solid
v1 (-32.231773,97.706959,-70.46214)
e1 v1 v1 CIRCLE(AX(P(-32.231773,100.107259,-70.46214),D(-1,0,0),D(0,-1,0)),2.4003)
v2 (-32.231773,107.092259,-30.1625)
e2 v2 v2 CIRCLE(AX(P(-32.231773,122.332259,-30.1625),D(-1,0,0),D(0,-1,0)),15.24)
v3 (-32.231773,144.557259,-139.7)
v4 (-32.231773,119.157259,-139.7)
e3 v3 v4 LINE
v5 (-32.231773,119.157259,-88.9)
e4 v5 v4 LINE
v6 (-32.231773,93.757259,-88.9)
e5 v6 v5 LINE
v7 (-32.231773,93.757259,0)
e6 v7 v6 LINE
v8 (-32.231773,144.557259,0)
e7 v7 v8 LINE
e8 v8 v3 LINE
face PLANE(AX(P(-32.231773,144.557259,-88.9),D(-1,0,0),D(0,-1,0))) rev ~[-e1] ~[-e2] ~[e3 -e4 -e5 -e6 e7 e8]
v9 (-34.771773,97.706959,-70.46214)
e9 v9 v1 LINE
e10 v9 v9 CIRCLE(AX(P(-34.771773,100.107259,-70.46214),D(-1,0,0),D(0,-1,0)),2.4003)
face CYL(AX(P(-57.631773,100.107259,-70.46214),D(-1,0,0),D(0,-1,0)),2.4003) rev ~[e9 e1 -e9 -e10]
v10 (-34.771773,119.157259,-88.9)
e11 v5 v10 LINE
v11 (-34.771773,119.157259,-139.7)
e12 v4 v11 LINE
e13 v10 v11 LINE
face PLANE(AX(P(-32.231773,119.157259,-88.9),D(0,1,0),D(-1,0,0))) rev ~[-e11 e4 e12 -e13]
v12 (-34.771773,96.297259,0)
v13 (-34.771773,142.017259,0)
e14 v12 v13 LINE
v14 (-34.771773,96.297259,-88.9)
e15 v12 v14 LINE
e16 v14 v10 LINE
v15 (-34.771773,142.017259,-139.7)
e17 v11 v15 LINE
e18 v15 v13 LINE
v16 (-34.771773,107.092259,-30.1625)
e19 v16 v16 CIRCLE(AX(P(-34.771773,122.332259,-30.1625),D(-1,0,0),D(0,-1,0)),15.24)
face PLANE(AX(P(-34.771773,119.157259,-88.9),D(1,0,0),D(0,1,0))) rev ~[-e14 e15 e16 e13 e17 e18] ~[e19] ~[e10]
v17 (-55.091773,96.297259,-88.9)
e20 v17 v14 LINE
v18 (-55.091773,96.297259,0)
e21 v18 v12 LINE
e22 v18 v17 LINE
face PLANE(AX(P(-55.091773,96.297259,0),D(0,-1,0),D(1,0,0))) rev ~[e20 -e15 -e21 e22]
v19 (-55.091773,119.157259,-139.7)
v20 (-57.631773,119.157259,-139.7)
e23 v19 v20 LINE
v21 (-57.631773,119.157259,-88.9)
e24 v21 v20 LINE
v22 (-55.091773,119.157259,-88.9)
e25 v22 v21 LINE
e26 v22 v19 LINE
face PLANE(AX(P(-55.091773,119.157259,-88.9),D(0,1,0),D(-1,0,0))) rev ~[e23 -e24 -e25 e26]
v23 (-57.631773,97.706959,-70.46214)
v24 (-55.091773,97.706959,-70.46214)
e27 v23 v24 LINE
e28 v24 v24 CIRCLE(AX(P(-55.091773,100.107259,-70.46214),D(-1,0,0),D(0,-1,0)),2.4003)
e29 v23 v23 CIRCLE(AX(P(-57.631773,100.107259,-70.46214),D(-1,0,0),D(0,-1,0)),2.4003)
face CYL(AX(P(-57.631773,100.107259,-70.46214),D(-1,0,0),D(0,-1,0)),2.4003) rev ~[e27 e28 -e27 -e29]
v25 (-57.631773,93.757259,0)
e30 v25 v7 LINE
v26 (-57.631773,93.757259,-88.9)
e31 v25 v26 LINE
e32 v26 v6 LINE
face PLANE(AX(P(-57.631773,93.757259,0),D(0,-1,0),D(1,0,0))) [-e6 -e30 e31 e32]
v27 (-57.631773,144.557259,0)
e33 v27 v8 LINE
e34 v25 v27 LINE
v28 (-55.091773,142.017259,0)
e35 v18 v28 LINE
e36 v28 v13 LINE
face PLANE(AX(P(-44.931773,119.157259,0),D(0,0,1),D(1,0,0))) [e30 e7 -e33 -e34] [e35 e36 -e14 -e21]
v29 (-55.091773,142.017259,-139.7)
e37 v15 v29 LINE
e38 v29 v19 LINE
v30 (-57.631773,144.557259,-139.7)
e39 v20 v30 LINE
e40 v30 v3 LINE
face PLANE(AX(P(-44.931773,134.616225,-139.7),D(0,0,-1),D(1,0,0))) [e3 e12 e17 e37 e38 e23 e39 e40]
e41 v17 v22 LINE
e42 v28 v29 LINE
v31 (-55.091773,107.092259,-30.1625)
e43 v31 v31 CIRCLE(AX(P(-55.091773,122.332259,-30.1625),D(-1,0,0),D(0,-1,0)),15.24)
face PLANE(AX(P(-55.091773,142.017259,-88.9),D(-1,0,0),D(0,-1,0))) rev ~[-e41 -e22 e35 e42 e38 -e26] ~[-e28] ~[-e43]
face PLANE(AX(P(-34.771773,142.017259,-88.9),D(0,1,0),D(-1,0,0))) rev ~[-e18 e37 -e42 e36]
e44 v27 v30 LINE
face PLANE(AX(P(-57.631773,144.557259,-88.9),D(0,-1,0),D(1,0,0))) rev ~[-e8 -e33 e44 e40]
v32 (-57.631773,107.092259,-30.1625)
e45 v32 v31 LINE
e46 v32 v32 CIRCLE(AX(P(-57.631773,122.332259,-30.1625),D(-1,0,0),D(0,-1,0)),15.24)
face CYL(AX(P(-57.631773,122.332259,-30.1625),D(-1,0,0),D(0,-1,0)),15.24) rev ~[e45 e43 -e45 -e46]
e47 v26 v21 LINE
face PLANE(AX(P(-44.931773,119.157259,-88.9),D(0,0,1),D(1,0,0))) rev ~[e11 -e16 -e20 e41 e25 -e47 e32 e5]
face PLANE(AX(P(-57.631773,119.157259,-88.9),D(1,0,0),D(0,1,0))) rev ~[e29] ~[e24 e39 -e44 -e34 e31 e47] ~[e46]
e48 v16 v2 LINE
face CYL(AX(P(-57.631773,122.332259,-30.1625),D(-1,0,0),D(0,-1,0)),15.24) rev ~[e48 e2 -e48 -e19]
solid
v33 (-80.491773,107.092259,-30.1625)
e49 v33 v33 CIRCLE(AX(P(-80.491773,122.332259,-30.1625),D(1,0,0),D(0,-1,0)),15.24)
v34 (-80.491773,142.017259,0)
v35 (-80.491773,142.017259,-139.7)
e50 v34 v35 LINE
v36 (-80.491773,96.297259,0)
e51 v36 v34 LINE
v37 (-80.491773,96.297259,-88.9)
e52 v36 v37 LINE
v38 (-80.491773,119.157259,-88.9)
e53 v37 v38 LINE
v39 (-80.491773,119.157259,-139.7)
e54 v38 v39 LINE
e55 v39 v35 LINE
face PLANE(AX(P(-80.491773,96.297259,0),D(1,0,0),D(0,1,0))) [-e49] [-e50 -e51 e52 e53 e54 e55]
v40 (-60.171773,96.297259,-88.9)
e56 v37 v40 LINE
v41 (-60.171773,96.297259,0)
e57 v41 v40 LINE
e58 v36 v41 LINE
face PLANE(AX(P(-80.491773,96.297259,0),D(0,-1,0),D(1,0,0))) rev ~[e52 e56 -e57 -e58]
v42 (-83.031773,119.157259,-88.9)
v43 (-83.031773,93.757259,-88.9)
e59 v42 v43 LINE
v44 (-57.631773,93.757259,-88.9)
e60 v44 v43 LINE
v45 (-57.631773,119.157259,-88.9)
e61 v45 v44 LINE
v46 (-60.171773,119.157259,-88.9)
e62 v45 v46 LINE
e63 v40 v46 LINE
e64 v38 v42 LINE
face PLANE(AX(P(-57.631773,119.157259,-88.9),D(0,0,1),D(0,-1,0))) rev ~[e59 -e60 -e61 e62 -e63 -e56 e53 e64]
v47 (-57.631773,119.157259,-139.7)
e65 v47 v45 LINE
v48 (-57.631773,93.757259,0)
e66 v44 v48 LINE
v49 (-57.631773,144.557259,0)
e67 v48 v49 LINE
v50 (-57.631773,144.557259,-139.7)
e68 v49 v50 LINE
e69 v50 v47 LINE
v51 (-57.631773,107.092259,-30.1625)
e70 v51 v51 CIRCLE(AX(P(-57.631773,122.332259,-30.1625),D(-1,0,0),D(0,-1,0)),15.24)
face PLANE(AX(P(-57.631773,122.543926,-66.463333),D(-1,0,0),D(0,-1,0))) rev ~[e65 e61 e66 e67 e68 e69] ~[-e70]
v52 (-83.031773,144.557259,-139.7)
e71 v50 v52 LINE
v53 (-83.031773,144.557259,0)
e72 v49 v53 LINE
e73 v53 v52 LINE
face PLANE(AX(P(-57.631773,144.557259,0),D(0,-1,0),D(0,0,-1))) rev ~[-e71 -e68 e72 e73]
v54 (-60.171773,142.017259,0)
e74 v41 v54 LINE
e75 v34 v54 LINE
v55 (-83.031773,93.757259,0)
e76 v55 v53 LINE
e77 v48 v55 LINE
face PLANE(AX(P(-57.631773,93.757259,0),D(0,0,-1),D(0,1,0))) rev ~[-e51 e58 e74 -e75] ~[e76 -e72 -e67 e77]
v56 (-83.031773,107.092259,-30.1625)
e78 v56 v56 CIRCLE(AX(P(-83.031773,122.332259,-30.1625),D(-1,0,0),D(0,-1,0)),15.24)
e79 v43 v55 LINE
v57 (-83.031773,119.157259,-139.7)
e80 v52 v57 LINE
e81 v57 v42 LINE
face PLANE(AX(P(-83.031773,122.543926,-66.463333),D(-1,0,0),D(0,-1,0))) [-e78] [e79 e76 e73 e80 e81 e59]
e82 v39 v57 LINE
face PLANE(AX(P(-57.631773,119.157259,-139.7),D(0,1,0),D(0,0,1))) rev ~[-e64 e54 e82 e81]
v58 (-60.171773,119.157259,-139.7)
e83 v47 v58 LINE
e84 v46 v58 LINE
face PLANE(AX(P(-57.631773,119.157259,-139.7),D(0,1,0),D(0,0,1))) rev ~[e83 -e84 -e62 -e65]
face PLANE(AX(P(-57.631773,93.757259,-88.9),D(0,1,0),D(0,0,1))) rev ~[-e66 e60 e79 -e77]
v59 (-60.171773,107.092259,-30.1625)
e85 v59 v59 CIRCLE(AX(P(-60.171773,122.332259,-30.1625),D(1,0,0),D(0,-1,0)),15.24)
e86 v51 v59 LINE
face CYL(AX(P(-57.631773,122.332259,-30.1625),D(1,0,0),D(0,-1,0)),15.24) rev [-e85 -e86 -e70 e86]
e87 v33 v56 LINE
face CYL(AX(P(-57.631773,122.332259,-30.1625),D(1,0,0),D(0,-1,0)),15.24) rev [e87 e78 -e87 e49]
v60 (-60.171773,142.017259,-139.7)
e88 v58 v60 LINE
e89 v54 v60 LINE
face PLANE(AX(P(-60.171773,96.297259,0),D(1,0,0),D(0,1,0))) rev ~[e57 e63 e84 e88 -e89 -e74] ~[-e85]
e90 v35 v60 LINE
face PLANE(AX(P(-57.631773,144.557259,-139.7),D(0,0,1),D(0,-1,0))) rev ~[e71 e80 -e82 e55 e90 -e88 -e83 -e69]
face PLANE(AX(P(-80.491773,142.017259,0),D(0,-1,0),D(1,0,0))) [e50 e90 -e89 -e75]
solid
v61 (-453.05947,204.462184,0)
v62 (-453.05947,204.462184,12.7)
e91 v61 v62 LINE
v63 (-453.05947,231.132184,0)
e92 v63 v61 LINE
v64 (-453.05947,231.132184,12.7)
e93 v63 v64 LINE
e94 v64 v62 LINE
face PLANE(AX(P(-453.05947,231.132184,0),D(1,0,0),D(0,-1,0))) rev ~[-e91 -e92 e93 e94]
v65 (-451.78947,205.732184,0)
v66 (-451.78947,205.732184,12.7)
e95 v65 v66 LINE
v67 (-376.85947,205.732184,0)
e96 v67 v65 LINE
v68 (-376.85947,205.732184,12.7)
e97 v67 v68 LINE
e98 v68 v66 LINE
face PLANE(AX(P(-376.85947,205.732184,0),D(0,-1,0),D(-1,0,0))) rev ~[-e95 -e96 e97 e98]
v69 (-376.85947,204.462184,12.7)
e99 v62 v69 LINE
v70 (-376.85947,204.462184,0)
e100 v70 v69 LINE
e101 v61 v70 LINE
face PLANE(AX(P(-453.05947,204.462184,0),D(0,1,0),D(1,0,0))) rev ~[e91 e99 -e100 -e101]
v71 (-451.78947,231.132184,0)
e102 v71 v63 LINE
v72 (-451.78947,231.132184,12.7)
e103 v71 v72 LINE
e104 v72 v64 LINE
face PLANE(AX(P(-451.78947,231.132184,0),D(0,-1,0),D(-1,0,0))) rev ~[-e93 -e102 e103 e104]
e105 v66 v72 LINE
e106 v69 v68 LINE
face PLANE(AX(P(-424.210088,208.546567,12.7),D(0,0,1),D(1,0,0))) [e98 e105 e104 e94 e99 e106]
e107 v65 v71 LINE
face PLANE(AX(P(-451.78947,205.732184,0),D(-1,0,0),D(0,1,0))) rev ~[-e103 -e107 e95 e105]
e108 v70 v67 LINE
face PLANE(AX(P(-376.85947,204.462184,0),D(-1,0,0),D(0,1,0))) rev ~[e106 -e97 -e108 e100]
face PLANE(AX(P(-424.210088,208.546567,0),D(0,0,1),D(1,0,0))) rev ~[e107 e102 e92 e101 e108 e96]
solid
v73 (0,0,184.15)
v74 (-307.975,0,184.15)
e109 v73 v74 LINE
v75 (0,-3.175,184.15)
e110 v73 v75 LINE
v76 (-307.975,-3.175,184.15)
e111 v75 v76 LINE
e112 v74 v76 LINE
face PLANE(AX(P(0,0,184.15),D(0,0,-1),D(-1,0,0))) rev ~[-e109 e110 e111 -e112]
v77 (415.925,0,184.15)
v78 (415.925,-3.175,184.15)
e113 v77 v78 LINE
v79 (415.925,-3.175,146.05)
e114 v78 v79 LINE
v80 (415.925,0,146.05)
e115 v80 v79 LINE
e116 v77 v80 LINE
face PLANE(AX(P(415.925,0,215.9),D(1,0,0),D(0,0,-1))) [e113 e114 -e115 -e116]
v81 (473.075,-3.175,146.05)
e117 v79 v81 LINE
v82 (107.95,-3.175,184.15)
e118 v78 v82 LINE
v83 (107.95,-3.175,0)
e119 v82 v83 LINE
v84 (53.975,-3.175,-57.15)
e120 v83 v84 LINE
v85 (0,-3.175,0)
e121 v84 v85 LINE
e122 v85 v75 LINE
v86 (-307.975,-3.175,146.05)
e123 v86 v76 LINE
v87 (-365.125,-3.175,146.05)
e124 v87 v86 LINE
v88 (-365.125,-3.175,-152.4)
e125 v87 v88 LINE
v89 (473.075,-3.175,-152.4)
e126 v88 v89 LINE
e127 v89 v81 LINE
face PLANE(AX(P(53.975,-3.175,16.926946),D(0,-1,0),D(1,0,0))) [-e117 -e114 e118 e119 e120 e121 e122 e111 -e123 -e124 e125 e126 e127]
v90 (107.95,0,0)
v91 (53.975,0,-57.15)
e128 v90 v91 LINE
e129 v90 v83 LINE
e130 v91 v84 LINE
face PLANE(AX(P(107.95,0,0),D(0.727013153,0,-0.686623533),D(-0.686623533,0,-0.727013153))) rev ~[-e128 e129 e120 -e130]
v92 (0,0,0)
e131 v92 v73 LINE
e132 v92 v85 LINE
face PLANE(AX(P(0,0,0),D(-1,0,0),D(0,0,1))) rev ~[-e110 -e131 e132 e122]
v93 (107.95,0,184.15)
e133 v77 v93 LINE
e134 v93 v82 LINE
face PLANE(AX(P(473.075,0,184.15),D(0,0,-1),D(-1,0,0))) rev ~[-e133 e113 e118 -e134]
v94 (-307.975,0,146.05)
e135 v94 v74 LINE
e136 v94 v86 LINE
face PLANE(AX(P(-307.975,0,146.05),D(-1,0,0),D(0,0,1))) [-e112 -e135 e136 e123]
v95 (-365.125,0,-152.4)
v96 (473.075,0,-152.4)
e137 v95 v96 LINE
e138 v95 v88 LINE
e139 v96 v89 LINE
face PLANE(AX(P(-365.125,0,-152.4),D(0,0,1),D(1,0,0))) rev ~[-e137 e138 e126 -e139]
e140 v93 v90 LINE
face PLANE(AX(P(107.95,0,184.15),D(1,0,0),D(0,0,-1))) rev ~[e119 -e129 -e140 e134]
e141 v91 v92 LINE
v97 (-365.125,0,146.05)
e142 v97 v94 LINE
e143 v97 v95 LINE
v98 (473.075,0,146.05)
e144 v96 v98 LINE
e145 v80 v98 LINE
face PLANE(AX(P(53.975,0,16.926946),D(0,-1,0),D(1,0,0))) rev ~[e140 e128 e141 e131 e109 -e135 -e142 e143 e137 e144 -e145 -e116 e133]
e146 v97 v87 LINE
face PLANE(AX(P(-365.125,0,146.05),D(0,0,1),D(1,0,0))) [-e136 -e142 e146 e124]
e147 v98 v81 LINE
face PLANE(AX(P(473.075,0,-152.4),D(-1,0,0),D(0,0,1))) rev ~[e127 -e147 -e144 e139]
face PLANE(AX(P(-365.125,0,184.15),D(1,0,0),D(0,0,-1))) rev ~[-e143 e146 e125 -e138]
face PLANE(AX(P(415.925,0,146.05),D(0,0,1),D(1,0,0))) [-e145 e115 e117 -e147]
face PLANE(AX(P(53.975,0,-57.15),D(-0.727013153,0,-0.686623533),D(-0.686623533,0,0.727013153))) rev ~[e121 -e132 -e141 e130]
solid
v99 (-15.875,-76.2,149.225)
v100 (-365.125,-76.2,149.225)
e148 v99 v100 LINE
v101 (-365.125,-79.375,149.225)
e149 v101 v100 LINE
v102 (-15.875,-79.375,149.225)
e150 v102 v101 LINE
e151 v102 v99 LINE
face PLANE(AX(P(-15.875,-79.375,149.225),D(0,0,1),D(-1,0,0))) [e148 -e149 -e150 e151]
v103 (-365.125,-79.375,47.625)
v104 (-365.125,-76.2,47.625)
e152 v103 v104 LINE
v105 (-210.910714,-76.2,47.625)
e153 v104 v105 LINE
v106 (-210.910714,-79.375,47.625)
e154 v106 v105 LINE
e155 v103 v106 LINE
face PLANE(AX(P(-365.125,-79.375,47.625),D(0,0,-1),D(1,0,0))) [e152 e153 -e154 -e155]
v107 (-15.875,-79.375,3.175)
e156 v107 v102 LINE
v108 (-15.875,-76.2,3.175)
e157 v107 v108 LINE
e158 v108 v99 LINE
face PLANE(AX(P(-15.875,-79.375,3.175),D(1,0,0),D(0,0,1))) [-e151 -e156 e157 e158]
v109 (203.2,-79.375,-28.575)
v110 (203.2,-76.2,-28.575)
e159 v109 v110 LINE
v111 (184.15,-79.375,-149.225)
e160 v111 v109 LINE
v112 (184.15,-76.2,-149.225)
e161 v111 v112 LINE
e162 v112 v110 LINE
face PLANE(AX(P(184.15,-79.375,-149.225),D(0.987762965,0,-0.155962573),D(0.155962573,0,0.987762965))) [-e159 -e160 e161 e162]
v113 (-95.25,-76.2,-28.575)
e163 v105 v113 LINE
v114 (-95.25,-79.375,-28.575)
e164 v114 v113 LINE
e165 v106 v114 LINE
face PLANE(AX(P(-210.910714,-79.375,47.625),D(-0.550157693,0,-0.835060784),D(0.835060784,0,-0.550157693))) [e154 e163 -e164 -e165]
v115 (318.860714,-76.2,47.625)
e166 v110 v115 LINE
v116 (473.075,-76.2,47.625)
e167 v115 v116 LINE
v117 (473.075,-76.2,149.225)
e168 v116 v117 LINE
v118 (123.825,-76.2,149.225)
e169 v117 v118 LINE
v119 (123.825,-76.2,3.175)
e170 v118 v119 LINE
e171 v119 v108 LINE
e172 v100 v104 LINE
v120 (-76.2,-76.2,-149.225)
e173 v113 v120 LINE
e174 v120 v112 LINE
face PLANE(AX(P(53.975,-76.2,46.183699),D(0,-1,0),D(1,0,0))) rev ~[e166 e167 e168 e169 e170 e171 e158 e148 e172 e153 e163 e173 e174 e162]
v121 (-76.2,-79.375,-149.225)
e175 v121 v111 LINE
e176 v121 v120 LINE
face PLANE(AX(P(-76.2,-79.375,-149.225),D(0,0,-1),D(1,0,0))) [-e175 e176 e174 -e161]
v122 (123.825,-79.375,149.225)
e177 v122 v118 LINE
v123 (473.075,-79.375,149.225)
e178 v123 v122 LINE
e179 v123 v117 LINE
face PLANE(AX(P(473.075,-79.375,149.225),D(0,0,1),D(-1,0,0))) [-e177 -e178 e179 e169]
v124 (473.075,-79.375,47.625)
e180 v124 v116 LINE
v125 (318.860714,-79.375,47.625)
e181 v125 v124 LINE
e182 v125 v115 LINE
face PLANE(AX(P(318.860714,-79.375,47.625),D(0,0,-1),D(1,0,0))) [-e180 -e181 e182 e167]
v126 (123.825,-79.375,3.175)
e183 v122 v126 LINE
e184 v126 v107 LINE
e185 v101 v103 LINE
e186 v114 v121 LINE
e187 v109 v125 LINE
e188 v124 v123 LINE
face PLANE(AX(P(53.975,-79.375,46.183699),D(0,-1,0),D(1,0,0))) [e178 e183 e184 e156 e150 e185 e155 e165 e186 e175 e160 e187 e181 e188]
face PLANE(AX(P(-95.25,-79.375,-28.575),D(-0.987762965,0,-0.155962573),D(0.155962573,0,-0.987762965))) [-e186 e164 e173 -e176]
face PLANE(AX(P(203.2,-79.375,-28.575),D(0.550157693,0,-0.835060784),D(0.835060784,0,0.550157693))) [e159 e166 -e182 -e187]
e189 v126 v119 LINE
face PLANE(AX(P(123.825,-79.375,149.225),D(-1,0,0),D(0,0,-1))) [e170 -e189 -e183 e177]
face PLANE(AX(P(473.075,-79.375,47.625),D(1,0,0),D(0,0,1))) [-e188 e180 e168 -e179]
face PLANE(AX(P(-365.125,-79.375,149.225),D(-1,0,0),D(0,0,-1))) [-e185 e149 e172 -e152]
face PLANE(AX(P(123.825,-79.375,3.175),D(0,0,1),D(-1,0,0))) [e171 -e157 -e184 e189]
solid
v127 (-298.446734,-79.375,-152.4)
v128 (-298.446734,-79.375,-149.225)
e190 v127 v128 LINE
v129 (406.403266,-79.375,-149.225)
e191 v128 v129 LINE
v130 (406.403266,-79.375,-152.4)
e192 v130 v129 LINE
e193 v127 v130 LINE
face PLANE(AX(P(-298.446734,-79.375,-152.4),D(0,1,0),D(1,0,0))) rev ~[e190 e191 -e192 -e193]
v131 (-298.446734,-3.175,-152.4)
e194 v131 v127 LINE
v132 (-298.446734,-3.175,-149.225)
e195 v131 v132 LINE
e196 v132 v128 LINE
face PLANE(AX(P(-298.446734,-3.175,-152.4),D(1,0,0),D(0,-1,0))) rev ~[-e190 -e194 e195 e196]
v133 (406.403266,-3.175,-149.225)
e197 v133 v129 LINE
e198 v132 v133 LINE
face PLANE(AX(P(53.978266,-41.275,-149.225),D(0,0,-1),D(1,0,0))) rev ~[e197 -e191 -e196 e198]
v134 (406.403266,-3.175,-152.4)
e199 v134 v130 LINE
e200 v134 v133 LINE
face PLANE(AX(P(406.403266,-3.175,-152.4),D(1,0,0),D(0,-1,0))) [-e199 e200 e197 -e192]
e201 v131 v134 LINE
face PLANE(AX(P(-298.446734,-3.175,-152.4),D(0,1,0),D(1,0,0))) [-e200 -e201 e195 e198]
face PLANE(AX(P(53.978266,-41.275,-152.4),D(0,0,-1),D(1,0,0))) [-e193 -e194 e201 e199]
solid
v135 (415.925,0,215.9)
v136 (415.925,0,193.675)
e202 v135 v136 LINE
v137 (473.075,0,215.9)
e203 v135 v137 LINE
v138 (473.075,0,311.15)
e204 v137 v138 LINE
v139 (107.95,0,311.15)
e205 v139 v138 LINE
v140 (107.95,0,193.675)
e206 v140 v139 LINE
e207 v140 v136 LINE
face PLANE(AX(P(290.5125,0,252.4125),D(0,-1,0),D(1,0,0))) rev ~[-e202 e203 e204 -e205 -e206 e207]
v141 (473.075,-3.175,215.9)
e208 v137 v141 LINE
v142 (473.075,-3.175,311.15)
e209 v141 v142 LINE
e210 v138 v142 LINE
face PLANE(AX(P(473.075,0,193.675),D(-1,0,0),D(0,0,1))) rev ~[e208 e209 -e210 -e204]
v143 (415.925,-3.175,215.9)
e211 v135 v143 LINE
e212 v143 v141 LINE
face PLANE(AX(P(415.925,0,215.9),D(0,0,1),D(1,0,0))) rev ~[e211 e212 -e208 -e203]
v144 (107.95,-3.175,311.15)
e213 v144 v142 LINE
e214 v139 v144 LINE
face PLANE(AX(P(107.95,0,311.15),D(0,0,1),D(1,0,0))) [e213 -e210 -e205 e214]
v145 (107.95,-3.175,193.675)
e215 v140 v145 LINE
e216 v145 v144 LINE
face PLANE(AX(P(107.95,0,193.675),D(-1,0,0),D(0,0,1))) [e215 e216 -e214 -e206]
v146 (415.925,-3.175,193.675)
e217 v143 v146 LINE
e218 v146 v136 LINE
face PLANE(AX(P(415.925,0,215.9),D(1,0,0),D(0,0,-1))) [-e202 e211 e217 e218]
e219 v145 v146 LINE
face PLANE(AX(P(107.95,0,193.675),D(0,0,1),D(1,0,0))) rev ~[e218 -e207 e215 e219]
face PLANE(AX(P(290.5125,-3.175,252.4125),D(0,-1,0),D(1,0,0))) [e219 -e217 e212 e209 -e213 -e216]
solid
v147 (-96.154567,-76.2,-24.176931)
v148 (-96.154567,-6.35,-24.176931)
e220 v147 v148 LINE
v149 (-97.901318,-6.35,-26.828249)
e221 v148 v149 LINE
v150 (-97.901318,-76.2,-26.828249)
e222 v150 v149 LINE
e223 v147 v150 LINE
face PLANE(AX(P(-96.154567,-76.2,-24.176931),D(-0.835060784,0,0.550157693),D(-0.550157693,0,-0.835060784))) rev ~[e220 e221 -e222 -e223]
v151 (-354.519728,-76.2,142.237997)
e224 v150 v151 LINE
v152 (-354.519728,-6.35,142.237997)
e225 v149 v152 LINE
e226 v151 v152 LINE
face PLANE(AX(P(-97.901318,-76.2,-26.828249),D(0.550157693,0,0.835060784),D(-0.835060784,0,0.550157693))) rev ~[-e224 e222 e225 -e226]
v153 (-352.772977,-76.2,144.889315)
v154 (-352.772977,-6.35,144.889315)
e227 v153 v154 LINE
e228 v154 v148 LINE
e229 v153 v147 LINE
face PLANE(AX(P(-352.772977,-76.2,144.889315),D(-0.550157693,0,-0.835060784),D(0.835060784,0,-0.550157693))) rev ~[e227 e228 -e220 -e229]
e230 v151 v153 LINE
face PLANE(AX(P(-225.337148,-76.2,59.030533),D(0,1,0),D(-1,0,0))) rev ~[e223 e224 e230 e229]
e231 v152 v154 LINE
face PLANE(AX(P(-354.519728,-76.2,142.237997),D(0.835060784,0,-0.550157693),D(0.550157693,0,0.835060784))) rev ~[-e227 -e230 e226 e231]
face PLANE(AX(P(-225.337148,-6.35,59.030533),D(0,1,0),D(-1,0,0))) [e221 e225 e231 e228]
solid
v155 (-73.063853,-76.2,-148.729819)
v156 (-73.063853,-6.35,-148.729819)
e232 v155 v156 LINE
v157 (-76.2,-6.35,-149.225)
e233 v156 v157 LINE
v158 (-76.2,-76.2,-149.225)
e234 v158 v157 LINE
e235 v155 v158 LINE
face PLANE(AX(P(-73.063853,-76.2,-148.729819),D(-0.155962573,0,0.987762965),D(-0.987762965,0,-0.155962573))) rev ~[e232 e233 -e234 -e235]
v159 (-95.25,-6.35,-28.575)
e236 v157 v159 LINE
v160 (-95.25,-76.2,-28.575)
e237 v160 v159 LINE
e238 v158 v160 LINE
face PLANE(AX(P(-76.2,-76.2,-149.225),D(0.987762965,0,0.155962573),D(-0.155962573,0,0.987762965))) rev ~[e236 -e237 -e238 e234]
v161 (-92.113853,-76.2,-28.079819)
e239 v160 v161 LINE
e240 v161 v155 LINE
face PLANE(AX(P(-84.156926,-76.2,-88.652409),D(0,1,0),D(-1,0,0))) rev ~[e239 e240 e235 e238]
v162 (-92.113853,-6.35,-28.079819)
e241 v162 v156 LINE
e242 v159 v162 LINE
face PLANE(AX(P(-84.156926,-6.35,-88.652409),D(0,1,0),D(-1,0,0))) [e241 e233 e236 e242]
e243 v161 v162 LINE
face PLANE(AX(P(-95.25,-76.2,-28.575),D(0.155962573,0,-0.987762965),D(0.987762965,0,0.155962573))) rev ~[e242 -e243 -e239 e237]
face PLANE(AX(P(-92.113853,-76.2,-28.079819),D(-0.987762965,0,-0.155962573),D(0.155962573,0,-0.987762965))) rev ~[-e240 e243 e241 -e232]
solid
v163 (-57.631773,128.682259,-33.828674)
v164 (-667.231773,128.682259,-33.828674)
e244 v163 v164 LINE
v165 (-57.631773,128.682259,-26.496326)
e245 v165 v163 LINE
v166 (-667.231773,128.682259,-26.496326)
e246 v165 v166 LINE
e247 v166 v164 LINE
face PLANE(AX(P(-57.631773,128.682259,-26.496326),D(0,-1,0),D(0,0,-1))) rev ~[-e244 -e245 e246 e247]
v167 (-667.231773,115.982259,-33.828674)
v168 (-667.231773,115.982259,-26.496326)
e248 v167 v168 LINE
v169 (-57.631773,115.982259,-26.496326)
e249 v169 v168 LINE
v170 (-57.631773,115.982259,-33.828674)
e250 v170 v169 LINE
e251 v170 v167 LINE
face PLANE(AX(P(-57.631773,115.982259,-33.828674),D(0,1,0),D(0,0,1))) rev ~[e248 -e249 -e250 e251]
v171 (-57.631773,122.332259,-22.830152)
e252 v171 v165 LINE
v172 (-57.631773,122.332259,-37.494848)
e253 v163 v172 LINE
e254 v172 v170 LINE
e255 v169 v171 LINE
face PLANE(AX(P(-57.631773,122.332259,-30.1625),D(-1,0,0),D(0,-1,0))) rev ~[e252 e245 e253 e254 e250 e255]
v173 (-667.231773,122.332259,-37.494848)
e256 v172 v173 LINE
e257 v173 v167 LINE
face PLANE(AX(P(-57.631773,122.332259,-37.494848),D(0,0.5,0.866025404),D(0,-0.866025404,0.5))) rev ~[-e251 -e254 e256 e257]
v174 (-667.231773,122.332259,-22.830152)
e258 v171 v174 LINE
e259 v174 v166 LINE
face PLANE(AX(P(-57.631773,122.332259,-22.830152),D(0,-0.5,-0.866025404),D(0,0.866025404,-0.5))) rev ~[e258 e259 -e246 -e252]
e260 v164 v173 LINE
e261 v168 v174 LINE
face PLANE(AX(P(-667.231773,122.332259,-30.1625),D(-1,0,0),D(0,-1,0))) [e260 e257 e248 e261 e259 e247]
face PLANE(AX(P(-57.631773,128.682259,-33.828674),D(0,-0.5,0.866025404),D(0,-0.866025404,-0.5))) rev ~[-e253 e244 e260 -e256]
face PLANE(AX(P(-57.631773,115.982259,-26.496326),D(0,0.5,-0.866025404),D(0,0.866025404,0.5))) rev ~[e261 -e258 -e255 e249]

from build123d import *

# Parameters (mm, degrees)
F1_DEPTH  = 3.175
F2_W      = 704.85
F2_H      = 76.2
F3_DEPTH  = 3.175
F0_W      = 365.125
F0_H      = 117.475
F4_DEPTH  = 3.175
F6_DEPTH  = 3.175
F8_DEPTH  = 69.85
F10_DEPTH = 69.85
F11_W     = 25.4
F11_H     = 50.8
F11_W_2   = 20.32
F11_H_2   = 45.72
F12_DEPTH = 88.9
F13_R     = 15.24
F13_R_2   = 2.4003
F14_DEPTH = 25.4
F16_DEPTH = 609.6
F17_W     = 57.15
F17_H     = 38.1
F17_H_2   = 31.75
F18_DEPTH = 3.175
F20_DEPTH = 12.7
F22_DEPTH = 50.8
F23_R     = 15.24
F24_DEPTH = 25.4
F25_W     = 20.32
F25_H     = 45.72
F26_DEPTH = 139.7


# Not quite as in the source:
# - a length typed as a fraction of an inch, garbled in the dataset ("3 / 203.2 mm" for 3/8 in), is restored


with BuildPart() as f1:
    # F0 (on Front) → F1 (new body)
    with BuildSketch(Plane.XZ):
        Polygon((0, 184.15), (-365.125, 184.15), (-365.125, -152.4), (473.075, -152.4), (473.075, 184.15), (107.95, 184.15), (107.95, 0), (53.975, -57.15), (0, 0), align=None)
    extrude(amount=F1_DEPTH)


with BuildPart() as f3:
    # F2 (on face) → F3 (new body)
    with BuildSketch(Plane(origin=(0, 0, -152.4), x_dir=(1, 0, 0), z_dir=(0, 0, -1))):
        with Locations((53.9782664609, 41.275)):
            Rectangle(F2_W, F2_H)
    extrude(amount=-F3_DEPTH)


with BuildPart() as f4:
    # F0 (on Front) → F4 (new body)
    with BuildSketch(Plane.XZ):
        with Locations((290.5125, 252.4125)):
            Rectangle(F0_W, F0_H)
    extrude(amount=F4_DEPTH)


with BuildPart() as f6:
    # F5 (on face) → F6 (new body)
    with BuildSketch(Plane.XZ.offset(79.375)):
        Polygon((-15.875, 3.175), (-15.875, 149.225), (-365.125, 149.225), (-210.9107142857, 47.625), (-95.25, -28.575), (-76.2, -149.225), (184.15, -149.225), (203.2, -28.575), (318.8607142857, 47.625), (473.075, 149.225), (123.825, 149.225), (123.825, 3.175), align=None)
        Polygon((-210.9107142857, 47.625), (-365.125, 149.225), (-365.125, 47.625), align=None)
        Polygon((473.075, 47.625), (473.075, 149.225), (318.8607142857, 47.625), align=None)
    extrude(amount=-F6_DEPTH)


with BuildPart() as f8:
    # F7 (on face) → F8 (new body)
    with BuildSketch(Plane(origin=(0, -76.2, 0), x_dir=(-1, 0, 0), z_dir=(0, 1, 0))):
        Polygon((76.2, -149.225), (95.25, -28.575), (92.1138525851, -28.0798188292), (73.0638525851, -148.7298188292), align=None)
    extrude(amount=F8_DEPTH)


with BuildPart() as f10:
    # F9 (on face) → F10 (new body)
    with BuildSketch(Plane(origin=(0, -76.2, 0), x_dir=(-1, 0, 0), z_dir=(0, 1, 0))):
        Polygon((210.9107142857, 47.625), (354.5197280439, 142.2379972995), (352.7729773688, 144.8893152885), (96.1545673139, -24.1769313358), (97.901317989, -26.8282493249), align=None)
    extrude(amount=F10_DEPTH)


with BuildPart() as f12:
    # F11 (on Top) → F12 (new body)
    with BuildSketch(Plane.XY):
        with Locations((-44.9317730963, 119.1572592371)):
            Rectangle(F11_W, F11_H)
        with Locations((-44.9317730963, 119.1572592371)):
            Rectangle(F11_W_2, F11_H_2, mode=Mode.SUBTRACT)
    extrude(amount=-F12_DEPTH)

    # F13 (on face) → F14 (cut, through all)
    with BuildSketch(Plane(origin=(-57.6317730963, 0, 0), x_dir=(0, -1, 0), z_dir=(-1, 0, 0))):
        with Locations((-122.3322592371, -30.1625)):
            Circle(F13_R)
        with Locations((-100.1072592371, -70.46214)):
            Circle(F13_R_2)
    extrude(amount=-F14_DEPTH, mode=Mode.SUBTRACT)

    # F21 (on face) → F22 (join)
    with BuildSketch(Plane(origin=(0, 0, -88.9), x_dir=(1, 0, 0), z_dir=(0, 0, -1))):
        Polygon((-34.7717730963, -142.0172592371), (-55.0917730963, -142.0172592371), (-55.0917730963, -119.1572592371), (-57.6317730963, -119.1572592371), (-57.6317730963, -144.5572592371), (-32.2317730963, -144.5572592371), (-32.2317730963, -119.1572592371), (-34.7717730963, -119.1572592371), align=None)
    extrude(amount=F22_DEPTH)


with BuildPart() as f16:
    # F15 (on face) → F16 (new body)
    with BuildSketch(Plane(origin=(-57.6317730963, 0, 0), x_dir=(0, -1, 0), z_dir=(-1, 0, 0))):
        Polygon((-122.3322592371, -37.4948484187), (-115.9822592371, -33.8286742094), (-115.9822592371, -26.4963257906), (-122.3322592371, -22.8301515813), (-128.6822592371, -26.4963257906), (-128.6822592371, -33.8286742094), align=None)
    extrude(amount=F16_DEPTH)


with BuildPart() as f18_tool:
    # F17 (on face) → F18 (new body, through all)
    with BuildSketch(Plane.XZ):
        with Locations((444.5, 165.1)):
            Rectangle(F17_W, F17_H)
        with Locations((444.5, 200.025)):
            Rectangle(F17_W, F17_H_2)
        with Locations((-336.55, 165.1)):
            Rectangle(F17_W, F17_H)
    extrude(amount=F18_DEPTH)


with BuildPart() as f1_1:
    add(f1.part)

    # F18: cut by f18_tool
    add(f18_tool.part, mode=Mode.SUBTRACT)


with BuildPart() as f4_1:
    add(f4.part)

    # F18: cut by f18_tool
    add(f18_tool.part, mode=Mode.SUBTRACT)


with BuildPart() as f20:
    # F19 (on Top) → F20 (new body)
    with BuildSketch(Plane.XY):
        Polygon((-451.7894704658, 231.1321839183), (-453.0594704658, 231.1321839183), (-453.0594704658, 204.4621839183), (-376.8594704658, 204.4621839183), (-376.8594704658, 205.7321839183), (-451.7894704658, 205.7321839183), align=None)
    extrude(amount=F20_DEPTH)


with BuildPart() as f24:
    # F23 (on face) → F24 (new body)
    with BuildSketch(Plane(origin=(-57.6317730963, 0, 0), x_dir=(0, -1, 0), z_dir=(-1, 0, 0))):
        Polygon((-119.1572592371, -139.7), (-119.1572592371, -88.9), (-93.7572592371, -88.9), (-93.7572592371, 0), (-144.5572592371, 0), (-144.5572592371, -139.7), align=None)
        with Locations((-122.3322592371, -30.1625)):
            Circle(F23_R, mode=Mode.SUBTRACT)
    extrude(amount=F24_DEPTH)

    # F25 (on face) → F26 (cut, through all)
    with BuildSketch(Plane.XY):
        with Locations((-70.3317730963, 119.1572592371)):
            Rectangle(F25_W, F25_H)
    extrude(amount=-F26_DEPTH, mode=Mode.SUBTRACT)


solid = Compound([f3.part, f6.part, f8.part, f10.part, f12.part, f16.part, f1_1.part, f4_1.part, f20.part, f24.part])
